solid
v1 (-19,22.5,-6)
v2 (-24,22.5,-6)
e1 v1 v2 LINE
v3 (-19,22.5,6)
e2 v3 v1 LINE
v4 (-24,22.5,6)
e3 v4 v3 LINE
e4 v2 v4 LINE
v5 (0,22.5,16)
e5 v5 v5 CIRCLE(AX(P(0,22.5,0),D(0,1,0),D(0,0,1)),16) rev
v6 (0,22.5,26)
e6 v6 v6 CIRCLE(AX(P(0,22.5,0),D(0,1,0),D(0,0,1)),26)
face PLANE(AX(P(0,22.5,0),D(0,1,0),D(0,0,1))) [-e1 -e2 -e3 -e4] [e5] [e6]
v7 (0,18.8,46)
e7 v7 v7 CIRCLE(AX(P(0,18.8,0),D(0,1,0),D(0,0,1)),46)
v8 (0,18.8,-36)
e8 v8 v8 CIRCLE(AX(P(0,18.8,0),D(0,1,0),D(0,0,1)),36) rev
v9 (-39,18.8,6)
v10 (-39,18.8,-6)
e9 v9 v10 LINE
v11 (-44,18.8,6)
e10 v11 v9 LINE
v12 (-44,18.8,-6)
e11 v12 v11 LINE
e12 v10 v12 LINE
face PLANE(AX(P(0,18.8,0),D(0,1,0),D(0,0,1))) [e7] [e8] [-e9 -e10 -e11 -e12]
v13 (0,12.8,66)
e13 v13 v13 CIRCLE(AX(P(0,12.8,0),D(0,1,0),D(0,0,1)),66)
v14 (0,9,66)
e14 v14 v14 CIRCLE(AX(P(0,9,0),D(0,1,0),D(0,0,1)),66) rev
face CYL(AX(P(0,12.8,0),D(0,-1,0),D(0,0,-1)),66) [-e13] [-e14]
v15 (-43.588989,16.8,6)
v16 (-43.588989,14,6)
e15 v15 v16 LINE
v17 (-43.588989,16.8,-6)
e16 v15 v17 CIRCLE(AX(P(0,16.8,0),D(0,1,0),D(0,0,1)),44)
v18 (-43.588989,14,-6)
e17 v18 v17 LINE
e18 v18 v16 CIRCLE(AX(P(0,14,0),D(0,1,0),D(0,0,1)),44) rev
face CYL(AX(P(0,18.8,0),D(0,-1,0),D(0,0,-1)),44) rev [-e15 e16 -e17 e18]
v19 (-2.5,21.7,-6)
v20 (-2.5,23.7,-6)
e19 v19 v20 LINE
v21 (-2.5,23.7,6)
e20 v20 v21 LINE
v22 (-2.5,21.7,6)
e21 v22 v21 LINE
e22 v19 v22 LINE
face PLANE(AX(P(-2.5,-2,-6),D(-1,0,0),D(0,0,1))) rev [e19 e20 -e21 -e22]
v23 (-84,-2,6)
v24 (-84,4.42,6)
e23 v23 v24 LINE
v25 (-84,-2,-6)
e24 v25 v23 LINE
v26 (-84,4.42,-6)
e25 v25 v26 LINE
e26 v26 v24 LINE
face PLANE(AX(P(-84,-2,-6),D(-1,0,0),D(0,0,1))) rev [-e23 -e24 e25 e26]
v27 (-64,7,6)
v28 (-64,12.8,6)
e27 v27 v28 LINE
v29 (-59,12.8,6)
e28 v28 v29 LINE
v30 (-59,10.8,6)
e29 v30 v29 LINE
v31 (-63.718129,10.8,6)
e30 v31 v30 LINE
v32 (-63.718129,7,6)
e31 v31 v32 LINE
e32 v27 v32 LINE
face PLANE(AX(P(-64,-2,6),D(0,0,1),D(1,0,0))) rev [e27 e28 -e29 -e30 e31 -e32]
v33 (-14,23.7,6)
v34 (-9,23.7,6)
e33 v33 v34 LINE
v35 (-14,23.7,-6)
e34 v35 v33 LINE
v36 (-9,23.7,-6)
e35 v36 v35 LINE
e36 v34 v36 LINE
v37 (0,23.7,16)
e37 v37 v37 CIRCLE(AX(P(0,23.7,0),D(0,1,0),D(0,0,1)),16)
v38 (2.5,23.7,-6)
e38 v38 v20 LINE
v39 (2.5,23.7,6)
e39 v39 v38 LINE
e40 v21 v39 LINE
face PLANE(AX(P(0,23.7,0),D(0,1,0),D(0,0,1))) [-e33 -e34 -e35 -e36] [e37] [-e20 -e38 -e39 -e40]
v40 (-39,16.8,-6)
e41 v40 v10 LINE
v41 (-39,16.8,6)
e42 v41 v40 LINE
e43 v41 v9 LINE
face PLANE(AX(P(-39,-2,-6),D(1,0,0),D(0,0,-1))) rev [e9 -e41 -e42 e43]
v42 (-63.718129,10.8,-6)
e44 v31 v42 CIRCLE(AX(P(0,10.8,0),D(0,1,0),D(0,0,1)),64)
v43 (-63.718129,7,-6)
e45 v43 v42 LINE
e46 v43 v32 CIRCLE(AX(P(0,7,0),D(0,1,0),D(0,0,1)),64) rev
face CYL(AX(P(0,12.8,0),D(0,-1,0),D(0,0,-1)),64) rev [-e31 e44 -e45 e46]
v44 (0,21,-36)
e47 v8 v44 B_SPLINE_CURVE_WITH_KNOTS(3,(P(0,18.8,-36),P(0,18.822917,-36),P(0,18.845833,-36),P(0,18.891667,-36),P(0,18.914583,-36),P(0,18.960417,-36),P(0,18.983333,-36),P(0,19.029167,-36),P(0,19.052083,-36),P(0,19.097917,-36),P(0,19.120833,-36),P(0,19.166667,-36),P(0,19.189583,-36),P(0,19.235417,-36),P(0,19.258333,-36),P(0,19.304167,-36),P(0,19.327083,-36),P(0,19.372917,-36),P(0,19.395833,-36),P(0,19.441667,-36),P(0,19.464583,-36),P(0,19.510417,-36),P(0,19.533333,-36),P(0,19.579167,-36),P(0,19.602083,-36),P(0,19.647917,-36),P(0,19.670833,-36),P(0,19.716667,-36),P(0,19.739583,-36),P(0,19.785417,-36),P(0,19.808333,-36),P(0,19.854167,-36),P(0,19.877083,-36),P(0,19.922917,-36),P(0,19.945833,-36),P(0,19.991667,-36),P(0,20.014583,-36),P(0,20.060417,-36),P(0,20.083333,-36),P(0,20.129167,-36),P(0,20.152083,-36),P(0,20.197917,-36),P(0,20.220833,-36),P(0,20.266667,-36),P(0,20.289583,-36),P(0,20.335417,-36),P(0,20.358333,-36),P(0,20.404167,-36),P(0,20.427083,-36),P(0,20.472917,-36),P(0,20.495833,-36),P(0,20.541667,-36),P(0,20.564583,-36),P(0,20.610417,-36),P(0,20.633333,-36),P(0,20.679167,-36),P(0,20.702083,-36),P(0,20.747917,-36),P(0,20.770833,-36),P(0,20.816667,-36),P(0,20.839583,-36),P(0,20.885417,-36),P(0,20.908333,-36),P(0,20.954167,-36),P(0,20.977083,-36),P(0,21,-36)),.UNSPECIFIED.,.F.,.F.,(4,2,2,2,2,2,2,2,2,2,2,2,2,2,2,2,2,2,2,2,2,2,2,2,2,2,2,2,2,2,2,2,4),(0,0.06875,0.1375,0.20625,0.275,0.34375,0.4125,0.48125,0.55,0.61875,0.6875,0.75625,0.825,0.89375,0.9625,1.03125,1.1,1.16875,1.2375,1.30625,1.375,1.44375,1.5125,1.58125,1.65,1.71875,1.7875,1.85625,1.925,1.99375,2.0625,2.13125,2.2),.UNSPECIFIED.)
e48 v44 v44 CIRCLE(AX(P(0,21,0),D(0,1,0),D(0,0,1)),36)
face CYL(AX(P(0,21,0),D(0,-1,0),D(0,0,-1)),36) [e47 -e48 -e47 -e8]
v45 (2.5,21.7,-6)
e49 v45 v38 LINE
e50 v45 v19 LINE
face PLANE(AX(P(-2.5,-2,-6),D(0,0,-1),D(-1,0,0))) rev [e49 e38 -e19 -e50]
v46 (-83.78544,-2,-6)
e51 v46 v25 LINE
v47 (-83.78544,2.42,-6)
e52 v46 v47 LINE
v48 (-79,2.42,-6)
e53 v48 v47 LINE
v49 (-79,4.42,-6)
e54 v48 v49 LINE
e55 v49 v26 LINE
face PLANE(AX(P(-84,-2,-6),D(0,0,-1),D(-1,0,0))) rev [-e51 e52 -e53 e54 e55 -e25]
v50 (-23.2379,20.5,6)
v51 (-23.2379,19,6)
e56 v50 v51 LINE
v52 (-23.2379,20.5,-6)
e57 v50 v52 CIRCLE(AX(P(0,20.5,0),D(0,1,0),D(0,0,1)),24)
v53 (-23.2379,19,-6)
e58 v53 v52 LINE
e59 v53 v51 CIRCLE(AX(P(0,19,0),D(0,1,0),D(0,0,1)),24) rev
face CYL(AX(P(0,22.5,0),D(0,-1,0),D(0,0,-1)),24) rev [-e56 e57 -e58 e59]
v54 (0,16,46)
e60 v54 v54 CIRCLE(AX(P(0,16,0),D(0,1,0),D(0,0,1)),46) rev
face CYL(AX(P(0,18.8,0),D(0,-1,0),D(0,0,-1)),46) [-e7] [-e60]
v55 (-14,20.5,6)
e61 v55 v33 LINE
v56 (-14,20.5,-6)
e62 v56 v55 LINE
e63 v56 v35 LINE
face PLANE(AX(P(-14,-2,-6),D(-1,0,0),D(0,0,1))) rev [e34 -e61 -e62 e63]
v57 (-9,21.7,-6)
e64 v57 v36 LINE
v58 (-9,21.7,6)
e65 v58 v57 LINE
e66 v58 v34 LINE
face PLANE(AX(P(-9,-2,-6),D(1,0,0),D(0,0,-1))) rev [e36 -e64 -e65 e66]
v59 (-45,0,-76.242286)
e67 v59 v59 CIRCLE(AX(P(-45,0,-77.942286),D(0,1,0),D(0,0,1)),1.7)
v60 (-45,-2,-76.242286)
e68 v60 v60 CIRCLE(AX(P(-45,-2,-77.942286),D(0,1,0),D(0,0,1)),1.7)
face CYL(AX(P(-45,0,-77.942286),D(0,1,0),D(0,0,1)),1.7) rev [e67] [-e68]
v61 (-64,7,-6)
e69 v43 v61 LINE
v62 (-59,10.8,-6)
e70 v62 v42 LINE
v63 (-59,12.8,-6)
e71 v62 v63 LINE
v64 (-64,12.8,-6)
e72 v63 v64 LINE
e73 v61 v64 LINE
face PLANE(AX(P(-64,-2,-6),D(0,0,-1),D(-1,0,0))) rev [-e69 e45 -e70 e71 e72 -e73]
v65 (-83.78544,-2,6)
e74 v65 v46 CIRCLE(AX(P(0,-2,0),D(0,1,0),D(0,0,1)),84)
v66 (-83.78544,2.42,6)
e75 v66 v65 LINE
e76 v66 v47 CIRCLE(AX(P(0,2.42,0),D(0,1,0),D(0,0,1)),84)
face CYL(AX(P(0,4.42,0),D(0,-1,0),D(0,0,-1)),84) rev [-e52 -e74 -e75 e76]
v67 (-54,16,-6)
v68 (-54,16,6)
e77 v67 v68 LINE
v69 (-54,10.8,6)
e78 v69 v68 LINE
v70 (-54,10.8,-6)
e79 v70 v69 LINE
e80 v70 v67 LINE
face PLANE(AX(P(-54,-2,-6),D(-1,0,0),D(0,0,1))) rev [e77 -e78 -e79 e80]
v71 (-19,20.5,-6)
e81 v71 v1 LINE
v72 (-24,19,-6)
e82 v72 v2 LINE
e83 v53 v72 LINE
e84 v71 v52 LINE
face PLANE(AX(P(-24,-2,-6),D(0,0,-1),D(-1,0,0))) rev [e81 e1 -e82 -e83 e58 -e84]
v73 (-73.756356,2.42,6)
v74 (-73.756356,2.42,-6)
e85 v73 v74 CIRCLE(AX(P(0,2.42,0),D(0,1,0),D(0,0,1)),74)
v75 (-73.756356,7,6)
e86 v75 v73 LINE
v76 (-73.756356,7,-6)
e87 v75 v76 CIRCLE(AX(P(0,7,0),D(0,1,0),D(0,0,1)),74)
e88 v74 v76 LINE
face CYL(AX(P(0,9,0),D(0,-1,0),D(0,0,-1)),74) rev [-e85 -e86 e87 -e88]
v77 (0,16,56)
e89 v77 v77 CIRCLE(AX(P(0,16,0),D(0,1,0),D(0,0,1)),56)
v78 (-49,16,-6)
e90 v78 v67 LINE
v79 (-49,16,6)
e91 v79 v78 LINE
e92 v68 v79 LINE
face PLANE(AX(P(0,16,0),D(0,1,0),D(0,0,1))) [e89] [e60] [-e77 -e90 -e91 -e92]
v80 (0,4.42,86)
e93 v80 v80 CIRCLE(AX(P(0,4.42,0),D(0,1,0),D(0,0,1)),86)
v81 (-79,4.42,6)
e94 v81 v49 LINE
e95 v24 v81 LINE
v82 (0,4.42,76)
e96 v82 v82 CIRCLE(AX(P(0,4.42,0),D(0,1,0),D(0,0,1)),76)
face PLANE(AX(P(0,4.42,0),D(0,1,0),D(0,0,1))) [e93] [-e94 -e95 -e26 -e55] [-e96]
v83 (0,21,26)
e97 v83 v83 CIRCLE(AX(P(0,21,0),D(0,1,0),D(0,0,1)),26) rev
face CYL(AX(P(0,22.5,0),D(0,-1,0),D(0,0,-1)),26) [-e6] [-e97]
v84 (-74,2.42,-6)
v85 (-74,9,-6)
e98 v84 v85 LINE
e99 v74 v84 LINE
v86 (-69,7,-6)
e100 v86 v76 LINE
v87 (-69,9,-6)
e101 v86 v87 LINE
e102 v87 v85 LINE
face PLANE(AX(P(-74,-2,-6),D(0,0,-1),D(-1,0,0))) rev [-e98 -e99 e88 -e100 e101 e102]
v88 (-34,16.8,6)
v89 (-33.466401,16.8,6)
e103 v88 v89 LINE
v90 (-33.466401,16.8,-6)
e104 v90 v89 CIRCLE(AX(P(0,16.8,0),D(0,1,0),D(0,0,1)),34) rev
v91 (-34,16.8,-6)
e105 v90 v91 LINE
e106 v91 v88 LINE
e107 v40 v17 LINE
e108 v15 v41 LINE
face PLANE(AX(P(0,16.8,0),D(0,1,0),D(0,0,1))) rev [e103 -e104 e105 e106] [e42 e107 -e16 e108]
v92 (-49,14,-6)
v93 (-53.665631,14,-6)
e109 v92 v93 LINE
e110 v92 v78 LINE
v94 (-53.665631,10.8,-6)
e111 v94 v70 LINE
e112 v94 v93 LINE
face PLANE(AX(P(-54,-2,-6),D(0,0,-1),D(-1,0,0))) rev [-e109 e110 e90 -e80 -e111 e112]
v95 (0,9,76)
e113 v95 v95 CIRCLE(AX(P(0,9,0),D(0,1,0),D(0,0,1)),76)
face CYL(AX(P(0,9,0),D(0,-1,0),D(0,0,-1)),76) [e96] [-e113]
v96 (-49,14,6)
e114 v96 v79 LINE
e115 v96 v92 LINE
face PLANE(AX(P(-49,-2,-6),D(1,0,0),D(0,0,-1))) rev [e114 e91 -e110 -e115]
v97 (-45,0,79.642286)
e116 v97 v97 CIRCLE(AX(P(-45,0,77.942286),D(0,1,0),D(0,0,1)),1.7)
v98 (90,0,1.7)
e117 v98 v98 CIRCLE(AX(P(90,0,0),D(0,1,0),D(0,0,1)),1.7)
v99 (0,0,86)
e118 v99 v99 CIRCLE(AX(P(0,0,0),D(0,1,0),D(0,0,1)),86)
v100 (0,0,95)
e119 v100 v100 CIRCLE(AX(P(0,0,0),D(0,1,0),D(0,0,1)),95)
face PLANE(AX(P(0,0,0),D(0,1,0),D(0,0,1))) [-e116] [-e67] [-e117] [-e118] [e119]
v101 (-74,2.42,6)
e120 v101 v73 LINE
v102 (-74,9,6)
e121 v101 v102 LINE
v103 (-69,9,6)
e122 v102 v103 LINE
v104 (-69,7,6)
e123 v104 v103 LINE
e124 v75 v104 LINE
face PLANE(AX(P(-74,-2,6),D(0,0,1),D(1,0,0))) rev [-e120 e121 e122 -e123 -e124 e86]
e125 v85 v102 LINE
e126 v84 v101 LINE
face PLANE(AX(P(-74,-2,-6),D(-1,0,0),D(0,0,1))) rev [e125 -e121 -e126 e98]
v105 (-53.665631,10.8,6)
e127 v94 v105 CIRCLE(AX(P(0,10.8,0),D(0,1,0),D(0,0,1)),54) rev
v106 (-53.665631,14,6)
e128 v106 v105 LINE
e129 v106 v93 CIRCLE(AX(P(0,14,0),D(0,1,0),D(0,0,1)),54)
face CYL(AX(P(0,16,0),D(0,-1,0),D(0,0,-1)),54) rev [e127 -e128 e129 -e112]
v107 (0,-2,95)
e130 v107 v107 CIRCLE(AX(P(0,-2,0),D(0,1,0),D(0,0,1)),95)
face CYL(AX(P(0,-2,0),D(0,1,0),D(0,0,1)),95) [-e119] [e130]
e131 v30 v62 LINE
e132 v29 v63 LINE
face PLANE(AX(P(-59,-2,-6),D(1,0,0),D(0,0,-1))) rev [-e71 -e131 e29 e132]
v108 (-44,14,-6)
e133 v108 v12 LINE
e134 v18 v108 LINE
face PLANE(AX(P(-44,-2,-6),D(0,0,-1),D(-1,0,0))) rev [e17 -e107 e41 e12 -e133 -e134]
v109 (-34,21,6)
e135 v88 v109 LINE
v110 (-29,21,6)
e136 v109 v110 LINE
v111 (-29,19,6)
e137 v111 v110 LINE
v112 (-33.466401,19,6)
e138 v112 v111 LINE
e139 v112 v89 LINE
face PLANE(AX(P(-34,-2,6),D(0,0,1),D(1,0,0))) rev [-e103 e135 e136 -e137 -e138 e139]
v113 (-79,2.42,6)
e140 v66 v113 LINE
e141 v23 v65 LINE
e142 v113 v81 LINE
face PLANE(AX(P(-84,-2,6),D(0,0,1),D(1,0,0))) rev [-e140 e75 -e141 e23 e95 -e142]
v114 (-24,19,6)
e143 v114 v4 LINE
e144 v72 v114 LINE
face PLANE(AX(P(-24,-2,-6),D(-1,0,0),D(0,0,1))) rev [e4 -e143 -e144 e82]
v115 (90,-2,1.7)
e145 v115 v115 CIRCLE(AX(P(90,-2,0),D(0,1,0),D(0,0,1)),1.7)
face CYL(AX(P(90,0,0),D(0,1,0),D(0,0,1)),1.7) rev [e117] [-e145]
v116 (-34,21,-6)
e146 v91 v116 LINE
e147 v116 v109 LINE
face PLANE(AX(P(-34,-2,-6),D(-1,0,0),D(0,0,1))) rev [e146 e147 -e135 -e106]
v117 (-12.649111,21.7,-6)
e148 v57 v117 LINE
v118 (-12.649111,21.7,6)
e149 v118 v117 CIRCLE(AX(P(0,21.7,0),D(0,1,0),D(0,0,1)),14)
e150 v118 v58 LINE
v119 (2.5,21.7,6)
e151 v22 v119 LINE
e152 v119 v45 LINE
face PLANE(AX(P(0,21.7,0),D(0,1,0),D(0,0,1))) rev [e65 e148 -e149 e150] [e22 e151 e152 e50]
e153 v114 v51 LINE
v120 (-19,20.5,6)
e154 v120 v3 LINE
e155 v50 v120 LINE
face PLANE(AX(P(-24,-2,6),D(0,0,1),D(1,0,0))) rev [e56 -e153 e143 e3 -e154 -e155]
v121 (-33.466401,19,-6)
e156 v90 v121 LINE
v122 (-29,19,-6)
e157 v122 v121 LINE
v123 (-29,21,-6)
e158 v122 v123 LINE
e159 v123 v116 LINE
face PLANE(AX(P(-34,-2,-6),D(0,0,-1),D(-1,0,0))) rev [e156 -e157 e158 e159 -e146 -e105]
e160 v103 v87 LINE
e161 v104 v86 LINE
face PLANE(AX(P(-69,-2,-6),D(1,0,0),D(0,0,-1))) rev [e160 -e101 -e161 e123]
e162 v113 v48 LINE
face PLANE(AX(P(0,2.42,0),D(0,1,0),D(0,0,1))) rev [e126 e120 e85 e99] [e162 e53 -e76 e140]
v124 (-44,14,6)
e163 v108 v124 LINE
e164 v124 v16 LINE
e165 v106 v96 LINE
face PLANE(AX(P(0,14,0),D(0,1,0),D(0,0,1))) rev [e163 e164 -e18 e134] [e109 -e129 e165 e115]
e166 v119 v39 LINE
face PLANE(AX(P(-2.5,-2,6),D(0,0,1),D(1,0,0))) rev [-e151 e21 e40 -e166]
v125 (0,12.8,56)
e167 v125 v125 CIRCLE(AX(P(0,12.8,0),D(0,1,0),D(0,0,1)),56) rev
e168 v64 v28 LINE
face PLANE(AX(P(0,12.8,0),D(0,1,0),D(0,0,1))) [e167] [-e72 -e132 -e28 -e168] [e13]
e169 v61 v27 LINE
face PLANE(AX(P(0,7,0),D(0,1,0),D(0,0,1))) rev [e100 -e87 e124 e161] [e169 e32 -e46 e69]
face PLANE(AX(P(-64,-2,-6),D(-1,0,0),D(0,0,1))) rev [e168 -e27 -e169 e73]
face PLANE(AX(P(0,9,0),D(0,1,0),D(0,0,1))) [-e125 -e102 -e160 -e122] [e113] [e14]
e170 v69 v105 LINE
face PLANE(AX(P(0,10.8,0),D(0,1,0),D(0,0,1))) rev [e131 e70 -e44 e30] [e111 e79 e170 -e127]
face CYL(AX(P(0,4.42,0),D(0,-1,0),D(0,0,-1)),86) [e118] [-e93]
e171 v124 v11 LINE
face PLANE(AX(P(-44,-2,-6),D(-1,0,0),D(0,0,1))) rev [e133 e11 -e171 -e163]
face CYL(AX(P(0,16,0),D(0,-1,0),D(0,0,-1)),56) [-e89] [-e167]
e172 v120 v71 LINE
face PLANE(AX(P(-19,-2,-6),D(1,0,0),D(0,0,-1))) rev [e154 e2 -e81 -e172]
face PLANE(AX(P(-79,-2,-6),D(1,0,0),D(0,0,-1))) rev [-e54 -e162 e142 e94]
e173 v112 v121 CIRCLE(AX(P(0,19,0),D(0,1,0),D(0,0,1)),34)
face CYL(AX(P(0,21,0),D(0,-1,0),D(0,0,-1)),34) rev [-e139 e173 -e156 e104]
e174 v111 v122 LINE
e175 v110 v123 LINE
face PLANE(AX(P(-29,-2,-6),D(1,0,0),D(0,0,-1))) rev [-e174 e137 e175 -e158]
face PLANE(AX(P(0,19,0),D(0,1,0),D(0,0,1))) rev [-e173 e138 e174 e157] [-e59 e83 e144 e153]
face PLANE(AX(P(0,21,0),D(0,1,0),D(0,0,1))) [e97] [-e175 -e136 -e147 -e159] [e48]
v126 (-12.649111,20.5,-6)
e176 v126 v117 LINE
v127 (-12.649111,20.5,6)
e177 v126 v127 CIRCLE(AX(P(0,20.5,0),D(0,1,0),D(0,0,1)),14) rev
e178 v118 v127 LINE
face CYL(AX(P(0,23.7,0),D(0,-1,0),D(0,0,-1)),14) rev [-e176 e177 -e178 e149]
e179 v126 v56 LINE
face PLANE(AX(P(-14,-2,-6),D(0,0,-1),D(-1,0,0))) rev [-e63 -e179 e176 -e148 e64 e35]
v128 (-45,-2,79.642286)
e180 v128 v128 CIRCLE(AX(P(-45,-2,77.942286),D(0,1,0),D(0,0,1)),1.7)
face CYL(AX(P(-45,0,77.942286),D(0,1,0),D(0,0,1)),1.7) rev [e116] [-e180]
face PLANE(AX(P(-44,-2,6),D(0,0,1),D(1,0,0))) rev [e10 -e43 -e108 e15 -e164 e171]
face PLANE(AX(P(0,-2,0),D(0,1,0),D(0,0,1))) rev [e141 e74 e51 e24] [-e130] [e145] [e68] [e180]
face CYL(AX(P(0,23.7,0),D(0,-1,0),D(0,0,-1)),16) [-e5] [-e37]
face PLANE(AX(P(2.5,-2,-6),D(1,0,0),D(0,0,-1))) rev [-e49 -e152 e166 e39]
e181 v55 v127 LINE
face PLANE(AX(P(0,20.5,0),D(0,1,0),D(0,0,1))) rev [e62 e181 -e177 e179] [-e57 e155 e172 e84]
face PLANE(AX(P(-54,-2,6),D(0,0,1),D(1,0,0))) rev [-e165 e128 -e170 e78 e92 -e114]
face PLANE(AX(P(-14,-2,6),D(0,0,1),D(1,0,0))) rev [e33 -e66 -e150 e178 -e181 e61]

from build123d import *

# Parameters (mm, degrees)
ESQUISSE1_R             = 95
BOSS_EXTRU_1_DEPTH      = 2
ESQUISSE1_12_R          = 86
ESQUISSE1_12_R_2        = 76
BOSS_EXTRU_11_DEPTH     = 4.42
ESQUISSE1_4_R           = 76
BOSS_EXTRU_3_DEPTH      = 9
ESQUISSE1_5_R           = 66
BOSS_EXTRU_4_DEPTH      = 12.8
ESQUISSE1_6_R           = 56
BOSS_EXTRU_5_DEPTH      = 16
ESQUISSE1_7_R           = 46
BOSS_EXTRU_6_DEPTH      = 18.8
ESQUISSE1_8_R           = 36
BOSS_EXTRU_7_DEPTH      = 21
ESQUISSE1_9_R           = 26
BOSS_EXTRU_8_DEPTH      = 22.5
ESQUISSE1_10_R          = 16
BOSS_EXTRU_9_DEPTH      = 23.7
COQUE1_START            = -2
COQUE1_OUTLINE_R        = 64
COQUE1_DEPTH            = 12.8
COQUE1_2_OUTLINE_R      = 84
COQUE1_2_OUTLINE_R_2    = 64
COQUE1_2_DEPTH          = 4.42
COQUE1_START_2          = 10.8
COQUE1_3_OUTLINE_R      = 44
COQUE1_3_DEPTH          = 6
COQUE1_START_3          = 2.42
COQUE1_4_OUTLINE_R      = 74
COQUE1_4_OUTLINE_R_2    = 64
COQUE1_4_DEPTH          = 4.58
COQUE1_5_OUTLINE_R      = 54
COQUE1_5_OUTLINE_R_2    = 44
COQUE1_5_DEPTH          = 3.2
COQUE1_START_4          = 16.8
COQUE1_6_OUTLINE_R      = 34
COQUE1_6_DEPTH          = 2.2
COQUE1_START_5          = 19
COQUE1_7_OUTLINE_R      = 24
COQUE1_7_DEPTH          = 1.5
COQUE1_START_6          = 20.5
COQUE1_8_OUTLINE_R      = 14
COQUE1_8_DEPTH          = 1.2
ESQUISSE4_W             = 5
ESQUISSE4_H             = 12
ENL_V_MAT_EXTRU_2_DEPTH = 137.786293173
D_GAGEMENT_M31_D        = 3.4


# Read off the part's stored shape, not the designer's step: Coque1
with BuildPart() as part:
    # Esquisse1 → Boss.-Extru.1 (new body)
    with BuildSketch(Plane(origin=(0, 0, 0), x_dir=(1, 0, 0), z_dir=(0, 1, 0))):
        with Locations(Location((0, 0, 0), (0, 0, 270))):
            Circle(ESQUISSE1_R)
    extrude(amount=-BOSS_EXTRU_1_DEPTH)

    # Esquisse1<12> → Boss.-Extru.11 (add)
    with BuildSketch(Plane(origin=(0, 0, 0), x_dir=(1, 0, 0), z_dir=(0, 1, 0))):
        with Locations(Location((0, 0, 0), (0, 0, 270))):
            Circle(ESQUISSE1_12_R)
        with Locations(Location((0, 0, 0), (0, 0, 270))):
            Circle(ESQUISSE1_12_R_2, mode=Mode.SUBTRACT)
    extrude(amount=BOSS_EXTRU_11_DEPTH)

    # Esquisse1<4> → Boss.-Extru.3 (add)
    with BuildSketch(Plane(origin=(0, 0, 0), x_dir=(1, 0, 0), z_dir=(0, 1, 0))):
        with Locations(Location((0, 0, 0), (0, 0, 270))):
            Circle(ESQUISSE1_4_R)
    extrude(amount=BOSS_EXTRU_3_DEPTH)

    # Esquisse1<5> → Boss.-Extru.4 (add)
    with BuildSketch(Plane(origin=(0, 0, 0), x_dir=(1, 0, 0), z_dir=(0, 1, 0))):
        with Locations(Location((0, 0, 0), (0, 0, 270))):
            Circle(ESQUISSE1_5_R)
    extrude(amount=BOSS_EXTRU_4_DEPTH)

    # Esquisse1<6> → Boss.-Extru.5 (add)
    with BuildSketch(Plane(origin=(0, 0, 0), x_dir=(1, 0, 0), z_dir=(0, 1, 0))):
        with Locations(Location((0, 0, 0), (0, 0, 270))):
            Circle(ESQUISSE1_6_R)
    extrude(amount=BOSS_EXTRU_5_DEPTH)

    # Esquisse1<7> → Boss.-Extru.6 (add)
    with BuildSketch(Plane(origin=(0, 0, 0), x_dir=(1, 0, 0), z_dir=(0, 1, 0))):
        with Locations(Location((0, 0, 0), (0, 0, 270))):
            Circle(ESQUISSE1_7_R)
    extrude(amount=BOSS_EXTRU_6_DEPTH)

    # Esquisse1<8> → Boss.-Extru.7 (add)
    with BuildSketch(Plane(origin=(0, 0, 0), x_dir=(1, 0, 0), z_dir=(0, 1, 0))):
        with Locations(Location((0, 0, 0), (0, 0, 90))):
            Circle(ESQUISSE1_8_R)
    extrude(amount=BOSS_EXTRU_7_DEPTH)

    # Esquisse1<9> → Boss.-Extru.8 (add)
    with BuildSketch(Plane(origin=(0, 0, 0), x_dir=(1, 0, 0), z_dir=(0, 1, 0))):
        with Locations(Location((0, 0, 0), (0, 0, 270))):
            Circle(ESQUISSE1_9_R)
    extrude(amount=BOSS_EXTRU_8_DEPTH)

    # Esquisse1<10> → Boss.-Extru.9 (add)
    with BuildSketch(Plane(origin=(0, 0, 0), x_dir=(1, 0, 0), z_dir=(0, 1, 0))):
        with Locations(Location((0, 0, 0), (0, 0, 270))):
            Circle(ESQUISSE1_10_R)
    extrude(amount=BOSS_EXTRU_9_DEPTH)

    # Coque1 outline → Coque1 (cut)
    with BuildSketch(Plane(origin=(0, 0, 0), x_dir=(1, 0, 0), z_dir=(0, 1, 0)).offset(COQUE1_START)):
        Circle(COQUE1_OUTLINE_R)
    extrude(amount=COQUE1_DEPTH, mode=Mode.SUBTRACT)

    # Coque1 2 outline → Coque1 2 (cut)
    with BuildSketch(Plane(origin=(0, 0, 0), x_dir=(1, 0, 0), z_dir=(0, 1, 0)).offset(COQUE1_START)):
        Circle(COQUE1_2_OUTLINE_R)
        Circle(COQUE1_2_OUTLINE_R_2, mode=Mode.SUBTRACT)
    extrude(amount=COQUE1_2_DEPTH, mode=Mode.SUBTRACT)

    # Coque1 3 outline → Coque1 3 (cut)
    with BuildSketch(Plane(origin=(0, 0, 0), x_dir=(1, 0, 0), z_dir=(0, 1, 0)).offset(COQUE1_START_2)):
        Circle(COQUE1_3_OUTLINE_R)
    extrude(amount=COQUE1_3_DEPTH, mode=Mode.SUBTRACT)

    # Coque1 4 outline → Coque1 4 (cut)
    with BuildSketch(Plane(origin=(0, 0, 0), x_dir=(1, 0, 0), z_dir=(0, 1, 0)).offset(COQUE1_START_3)):
        Circle(COQUE1_4_OUTLINE_R)
        Circle(COQUE1_4_OUTLINE_R_2, mode=Mode.SUBTRACT)
    extrude(amount=COQUE1_4_DEPTH, mode=Mode.SUBTRACT)

    # Coque1 5 outline → Coque1 5 (cut)
    with BuildSketch(Plane(origin=(0, 0, 0), x_dir=(1, 0, 0), z_dir=(0, 1, 0)).offset(COQUE1_START_2)):
        Circle(COQUE1_5_OUTLINE_R)
        Circle(COQUE1_5_OUTLINE_R_2, mode=Mode.SUBTRACT)
    extrude(amount=COQUE1_5_DEPTH, mode=Mode.SUBTRACT)

    # Coque1 6 outline → Coque1 6 (cut)
    with BuildSketch(Plane(origin=(0, 0, 0), x_dir=(1, 0, 0), z_dir=(0, 1, 0)).offset(COQUE1_START_4)):
        Circle(COQUE1_6_OUTLINE_R)
    extrude(amount=COQUE1_6_DEPTH, mode=Mode.SUBTRACT)

    # Coque1 7 outline → Coque1 7 (cut)
    with BuildSketch(Plane(origin=(0, 0, 0), x_dir=(1, 0, 0), z_dir=(0, 1, 0)).offset(COQUE1_START_5)):
        Circle(COQUE1_7_OUTLINE_R)
    extrude(amount=COQUE1_7_DEPTH, mode=Mode.SUBTRACT)

    # Coque1 8 outline → Coque1 8 (cut)
    with BuildSketch(Plane(origin=(0, 0, 0), x_dir=(1, 0, 0), z_dir=(0, 1, 0)).offset(COQUE1_START_6)):
        Circle(COQUE1_8_OUTLINE_R)
    extrude(amount=COQUE1_8_DEPTH, mode=Mode.SUBTRACT)

    # Esquisse4 → Enlèv. mat.-Extru.2 (cut, through all)
    with BuildSketch(Plane(origin=(0, 23.7, 0), x_dir=(1, 0, 0), z_dir=(0, 1, 0))):
        with Locations((-21.5, 0)):
            Rectangle(ESQUISSE4_W, ESQUISSE4_H)
        Rectangle(ESQUISSE4_W, ESQUISSE4_H)
        with Locations((-11.5, 0)):
            Rectangle(ESQUISSE4_W, ESQUISSE4_H)
        with Locations((-31.5, 0)):
            Rectangle(ESQUISSE4_W, ESQUISSE4_H)
        with Locations((-41.5, 0)):
            Rectangle(ESQUISSE4_W, ESQUISSE4_H)
        with Locations((-51.5, 0)):
            Rectangle(ESQUISSE4_W, ESQUISSE4_H)
        with Locations((-61.5, 0)):
            Rectangle(ESQUISSE4_W, ESQUISSE4_H)
        with Locations((-71.5, 0)):
            Rectangle(ESQUISSE4_W, ESQUISSE4_H)
        with Locations((-81.5, 0)):
            Rectangle(ESQUISSE4_W, ESQUISSE4_H)
    extrude(amount=-ENL_V_MAT_EXTRU_2_DEPTH, mode=Mode.SUBTRACT)

    # Dégagement M31 (through all)
    with Locations(Plane(origin=(0, 0, 0), x_dir=(1, 0, 0), z_dir=(0, 1, 0))):
        with Locations((90, 0), (-45, 77.942286341), (-45, -77.942286341)):
            Hole(D_GAGEMENT_M31_D / 2)


solid = part.part
